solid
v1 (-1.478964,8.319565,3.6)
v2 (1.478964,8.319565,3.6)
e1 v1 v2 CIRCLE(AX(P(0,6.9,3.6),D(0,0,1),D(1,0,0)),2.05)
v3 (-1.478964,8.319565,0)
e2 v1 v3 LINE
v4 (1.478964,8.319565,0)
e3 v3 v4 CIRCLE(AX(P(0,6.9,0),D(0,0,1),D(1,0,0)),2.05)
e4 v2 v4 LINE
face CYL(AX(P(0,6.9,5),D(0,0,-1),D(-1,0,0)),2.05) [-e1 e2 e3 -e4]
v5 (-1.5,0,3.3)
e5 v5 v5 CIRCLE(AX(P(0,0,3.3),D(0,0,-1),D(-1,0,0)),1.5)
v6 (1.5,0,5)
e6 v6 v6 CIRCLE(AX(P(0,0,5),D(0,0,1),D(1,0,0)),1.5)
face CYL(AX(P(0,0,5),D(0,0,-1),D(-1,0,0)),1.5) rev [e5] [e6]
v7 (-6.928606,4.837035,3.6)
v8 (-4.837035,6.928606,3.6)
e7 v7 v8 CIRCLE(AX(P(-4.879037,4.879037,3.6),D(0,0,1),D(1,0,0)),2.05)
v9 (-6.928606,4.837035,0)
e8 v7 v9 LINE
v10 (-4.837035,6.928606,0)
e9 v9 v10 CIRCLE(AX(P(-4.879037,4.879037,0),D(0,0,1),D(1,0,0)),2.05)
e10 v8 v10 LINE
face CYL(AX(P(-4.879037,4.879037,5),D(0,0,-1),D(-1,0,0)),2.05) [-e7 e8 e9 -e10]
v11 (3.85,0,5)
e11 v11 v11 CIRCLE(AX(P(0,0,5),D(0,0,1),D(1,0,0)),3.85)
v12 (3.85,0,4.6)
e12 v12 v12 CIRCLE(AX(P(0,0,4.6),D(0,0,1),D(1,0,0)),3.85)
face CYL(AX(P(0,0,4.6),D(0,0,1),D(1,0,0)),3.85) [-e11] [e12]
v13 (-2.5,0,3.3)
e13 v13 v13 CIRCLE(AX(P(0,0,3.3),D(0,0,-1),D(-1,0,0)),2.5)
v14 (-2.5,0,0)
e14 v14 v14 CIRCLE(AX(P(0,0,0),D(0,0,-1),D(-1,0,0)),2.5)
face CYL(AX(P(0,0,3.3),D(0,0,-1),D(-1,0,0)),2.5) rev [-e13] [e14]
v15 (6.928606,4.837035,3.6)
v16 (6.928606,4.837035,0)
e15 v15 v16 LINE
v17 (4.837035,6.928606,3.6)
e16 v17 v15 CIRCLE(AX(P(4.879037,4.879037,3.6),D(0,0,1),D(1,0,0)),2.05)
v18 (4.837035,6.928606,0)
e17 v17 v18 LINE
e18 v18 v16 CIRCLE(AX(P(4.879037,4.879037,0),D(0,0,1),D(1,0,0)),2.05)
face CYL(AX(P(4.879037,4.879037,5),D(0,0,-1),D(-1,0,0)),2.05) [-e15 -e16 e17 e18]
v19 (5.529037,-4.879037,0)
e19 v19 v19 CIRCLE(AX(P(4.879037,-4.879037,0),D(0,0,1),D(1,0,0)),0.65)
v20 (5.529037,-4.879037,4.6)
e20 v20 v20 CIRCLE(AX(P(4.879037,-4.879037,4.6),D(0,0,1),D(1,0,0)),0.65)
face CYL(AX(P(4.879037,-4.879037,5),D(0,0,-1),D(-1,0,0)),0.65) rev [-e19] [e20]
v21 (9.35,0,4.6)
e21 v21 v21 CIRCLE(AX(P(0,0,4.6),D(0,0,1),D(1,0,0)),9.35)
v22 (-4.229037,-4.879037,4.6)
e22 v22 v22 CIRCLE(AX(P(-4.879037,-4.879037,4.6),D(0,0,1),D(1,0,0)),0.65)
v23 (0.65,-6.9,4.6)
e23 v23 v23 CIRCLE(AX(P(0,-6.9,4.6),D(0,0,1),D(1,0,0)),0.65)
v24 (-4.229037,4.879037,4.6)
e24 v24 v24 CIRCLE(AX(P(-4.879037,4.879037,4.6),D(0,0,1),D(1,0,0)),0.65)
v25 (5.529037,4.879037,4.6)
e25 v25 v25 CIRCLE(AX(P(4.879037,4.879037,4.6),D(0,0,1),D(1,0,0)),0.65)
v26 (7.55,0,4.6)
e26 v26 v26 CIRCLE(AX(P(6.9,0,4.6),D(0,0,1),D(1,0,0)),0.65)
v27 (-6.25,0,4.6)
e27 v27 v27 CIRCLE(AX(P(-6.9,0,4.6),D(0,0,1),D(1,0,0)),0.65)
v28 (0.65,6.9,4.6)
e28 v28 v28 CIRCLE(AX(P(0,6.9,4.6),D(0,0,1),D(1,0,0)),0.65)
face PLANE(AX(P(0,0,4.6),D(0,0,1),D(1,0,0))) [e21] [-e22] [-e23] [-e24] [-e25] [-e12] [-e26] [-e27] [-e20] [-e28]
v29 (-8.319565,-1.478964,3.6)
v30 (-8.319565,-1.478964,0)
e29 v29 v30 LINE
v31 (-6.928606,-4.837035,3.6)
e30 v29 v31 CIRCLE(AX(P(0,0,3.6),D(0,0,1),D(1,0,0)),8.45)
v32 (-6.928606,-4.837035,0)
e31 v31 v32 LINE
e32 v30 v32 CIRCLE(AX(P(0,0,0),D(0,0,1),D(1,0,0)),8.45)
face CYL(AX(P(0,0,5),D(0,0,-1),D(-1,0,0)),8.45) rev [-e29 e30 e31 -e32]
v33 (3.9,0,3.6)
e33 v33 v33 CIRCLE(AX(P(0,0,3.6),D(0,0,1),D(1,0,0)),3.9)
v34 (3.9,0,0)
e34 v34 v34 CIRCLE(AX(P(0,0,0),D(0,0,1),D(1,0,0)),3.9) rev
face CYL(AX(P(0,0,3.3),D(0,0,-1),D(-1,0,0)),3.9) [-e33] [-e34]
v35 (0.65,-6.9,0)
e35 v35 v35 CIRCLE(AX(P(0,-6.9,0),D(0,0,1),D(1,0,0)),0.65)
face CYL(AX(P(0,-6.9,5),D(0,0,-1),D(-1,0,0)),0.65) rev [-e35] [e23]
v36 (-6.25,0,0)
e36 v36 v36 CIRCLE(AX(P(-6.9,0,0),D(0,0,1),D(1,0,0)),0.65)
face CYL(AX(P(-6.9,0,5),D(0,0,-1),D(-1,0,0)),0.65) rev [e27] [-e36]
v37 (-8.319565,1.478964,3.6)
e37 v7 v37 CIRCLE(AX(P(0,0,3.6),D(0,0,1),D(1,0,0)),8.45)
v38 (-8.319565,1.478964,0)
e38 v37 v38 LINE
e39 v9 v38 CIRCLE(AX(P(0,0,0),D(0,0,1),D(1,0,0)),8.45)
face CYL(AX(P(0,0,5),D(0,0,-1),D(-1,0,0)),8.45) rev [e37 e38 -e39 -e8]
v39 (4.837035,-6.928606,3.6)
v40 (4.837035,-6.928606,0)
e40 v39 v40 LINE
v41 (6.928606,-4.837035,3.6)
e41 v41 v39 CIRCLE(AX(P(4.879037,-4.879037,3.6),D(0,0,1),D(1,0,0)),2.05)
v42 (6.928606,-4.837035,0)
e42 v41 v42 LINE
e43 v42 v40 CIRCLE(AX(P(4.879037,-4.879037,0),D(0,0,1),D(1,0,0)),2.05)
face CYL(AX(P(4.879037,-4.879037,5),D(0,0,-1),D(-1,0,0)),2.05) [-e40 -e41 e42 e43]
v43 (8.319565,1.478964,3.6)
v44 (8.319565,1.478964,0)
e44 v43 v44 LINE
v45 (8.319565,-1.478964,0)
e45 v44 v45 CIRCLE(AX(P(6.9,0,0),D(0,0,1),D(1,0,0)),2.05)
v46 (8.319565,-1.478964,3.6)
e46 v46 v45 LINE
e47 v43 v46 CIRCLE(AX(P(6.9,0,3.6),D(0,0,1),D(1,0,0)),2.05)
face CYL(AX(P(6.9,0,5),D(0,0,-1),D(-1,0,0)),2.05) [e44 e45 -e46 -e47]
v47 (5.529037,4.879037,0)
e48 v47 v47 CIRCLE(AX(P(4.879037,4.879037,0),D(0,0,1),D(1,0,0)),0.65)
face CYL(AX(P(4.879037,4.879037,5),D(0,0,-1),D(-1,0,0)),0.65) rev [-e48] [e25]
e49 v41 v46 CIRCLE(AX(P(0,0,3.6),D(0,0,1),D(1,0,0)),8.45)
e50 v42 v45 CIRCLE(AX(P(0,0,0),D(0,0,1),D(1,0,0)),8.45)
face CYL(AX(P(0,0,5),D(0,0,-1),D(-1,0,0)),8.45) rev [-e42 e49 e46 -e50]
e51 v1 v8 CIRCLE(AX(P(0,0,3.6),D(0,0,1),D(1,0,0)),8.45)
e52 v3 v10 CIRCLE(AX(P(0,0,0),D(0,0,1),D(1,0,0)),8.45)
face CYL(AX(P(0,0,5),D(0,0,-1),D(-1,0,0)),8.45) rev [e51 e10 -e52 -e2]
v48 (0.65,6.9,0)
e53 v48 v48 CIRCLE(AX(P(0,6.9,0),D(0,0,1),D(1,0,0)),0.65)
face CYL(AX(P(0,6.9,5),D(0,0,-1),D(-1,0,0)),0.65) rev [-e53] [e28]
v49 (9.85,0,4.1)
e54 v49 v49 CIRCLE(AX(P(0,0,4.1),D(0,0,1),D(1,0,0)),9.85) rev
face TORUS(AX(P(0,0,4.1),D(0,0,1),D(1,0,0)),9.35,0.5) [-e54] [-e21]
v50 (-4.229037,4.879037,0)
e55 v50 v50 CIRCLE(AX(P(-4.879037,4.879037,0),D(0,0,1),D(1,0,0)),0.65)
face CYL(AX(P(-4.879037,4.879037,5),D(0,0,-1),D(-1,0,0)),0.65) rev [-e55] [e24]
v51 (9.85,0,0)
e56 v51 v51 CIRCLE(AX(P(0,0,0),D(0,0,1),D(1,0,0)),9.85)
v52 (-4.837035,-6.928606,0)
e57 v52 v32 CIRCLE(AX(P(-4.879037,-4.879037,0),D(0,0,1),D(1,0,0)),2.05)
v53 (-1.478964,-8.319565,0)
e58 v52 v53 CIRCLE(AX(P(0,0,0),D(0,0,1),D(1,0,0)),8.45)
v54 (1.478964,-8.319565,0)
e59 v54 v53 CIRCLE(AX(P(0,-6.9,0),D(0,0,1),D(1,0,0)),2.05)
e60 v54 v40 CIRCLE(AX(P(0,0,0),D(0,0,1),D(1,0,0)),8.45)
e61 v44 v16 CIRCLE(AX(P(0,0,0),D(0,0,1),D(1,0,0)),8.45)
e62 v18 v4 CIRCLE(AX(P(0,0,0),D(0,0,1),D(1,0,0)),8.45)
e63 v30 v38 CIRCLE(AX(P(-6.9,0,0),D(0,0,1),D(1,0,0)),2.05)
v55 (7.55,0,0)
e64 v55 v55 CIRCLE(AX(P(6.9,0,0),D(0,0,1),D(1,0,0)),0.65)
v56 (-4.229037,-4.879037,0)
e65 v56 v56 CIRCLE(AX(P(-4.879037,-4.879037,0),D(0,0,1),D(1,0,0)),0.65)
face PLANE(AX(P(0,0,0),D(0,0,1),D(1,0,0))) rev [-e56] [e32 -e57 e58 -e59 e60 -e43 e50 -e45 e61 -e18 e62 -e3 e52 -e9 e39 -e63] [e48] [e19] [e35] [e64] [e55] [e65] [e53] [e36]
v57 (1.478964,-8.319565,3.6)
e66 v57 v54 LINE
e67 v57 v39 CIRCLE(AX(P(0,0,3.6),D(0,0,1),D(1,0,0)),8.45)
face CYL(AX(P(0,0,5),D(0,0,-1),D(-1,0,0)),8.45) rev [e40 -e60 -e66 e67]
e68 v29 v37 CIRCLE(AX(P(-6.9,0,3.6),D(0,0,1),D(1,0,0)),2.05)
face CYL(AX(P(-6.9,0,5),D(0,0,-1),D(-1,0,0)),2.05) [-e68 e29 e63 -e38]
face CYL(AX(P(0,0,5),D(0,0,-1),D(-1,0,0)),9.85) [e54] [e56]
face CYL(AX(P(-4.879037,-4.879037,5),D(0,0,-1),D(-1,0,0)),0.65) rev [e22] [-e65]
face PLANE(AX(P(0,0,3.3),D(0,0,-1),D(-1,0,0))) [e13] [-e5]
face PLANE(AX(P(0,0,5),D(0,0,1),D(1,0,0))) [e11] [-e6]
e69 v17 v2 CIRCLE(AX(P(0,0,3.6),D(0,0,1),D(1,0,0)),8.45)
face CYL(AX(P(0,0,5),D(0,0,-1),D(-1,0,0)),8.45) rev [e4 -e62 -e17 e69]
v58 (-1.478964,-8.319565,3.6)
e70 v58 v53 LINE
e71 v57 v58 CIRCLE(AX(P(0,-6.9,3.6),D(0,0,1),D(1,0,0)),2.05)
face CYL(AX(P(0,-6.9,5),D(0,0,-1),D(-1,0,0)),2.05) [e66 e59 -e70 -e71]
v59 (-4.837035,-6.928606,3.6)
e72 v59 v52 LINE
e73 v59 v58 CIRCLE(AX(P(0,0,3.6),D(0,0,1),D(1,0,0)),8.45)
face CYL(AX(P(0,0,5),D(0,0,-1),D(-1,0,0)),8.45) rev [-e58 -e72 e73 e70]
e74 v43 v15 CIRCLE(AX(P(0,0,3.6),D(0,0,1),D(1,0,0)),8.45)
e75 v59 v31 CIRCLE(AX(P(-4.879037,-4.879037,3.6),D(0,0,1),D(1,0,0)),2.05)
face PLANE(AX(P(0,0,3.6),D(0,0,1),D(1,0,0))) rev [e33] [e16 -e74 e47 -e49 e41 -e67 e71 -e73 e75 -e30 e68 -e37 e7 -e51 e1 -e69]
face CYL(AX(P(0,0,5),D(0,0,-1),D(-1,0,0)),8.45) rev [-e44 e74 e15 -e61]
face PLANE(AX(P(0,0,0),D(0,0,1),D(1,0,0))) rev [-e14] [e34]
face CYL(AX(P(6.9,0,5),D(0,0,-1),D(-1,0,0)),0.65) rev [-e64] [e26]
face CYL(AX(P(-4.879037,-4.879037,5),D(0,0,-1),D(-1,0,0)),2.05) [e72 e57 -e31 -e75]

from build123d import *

# Parameters (mm, degrees)
SKETCH1_R           = 9.85
SKETCH1_R_2         = 1.5
SKETCH1_R_3         = 0.65
BOSS_EXTRUDE1_DEPTH = 5
SKETCH4_R           = 2.5
CUT_EXTRUDE2_DEPTH  = 3.3
SHELL1_OUTLINE_R    = 3.9
SHELL1_DEPTH        = 3.6
CUT_EXTRUDE1_START  = -0.4
SKETCH3_R           = 9.85
SKETCH3_R_2         = 3.85
CUT_EXTRUDE1_DEPTH  = 0.4
FILLET1_R           = 0.5


# Read off the part's stored shape, not the designer's step: Shell1
with BuildPart() as part:
    # Sketch1 → Boss-Extrude1 (new body)
    with BuildSketch(Plane.XY):
        Circle(SKETCH1_R)
        Circle(SKETCH1_R_2, mode=Mode.SUBTRACT)
        with Locations((0, 6.9)):
            Circle(SKETCH1_R_3, mode=Mode.SUBTRACT)
        with Locations((4.87903679, 4.87903679)):
            Circle(SKETCH1_R_3, mode=Mode.SUBTRACT)
        with Locations((6.9, 0)):
            Circle(SKETCH1_R_3, mode=Mode.SUBTRACT)
        with Locations((4.87903679, -4.87903679)):
            Circle(SKETCH1_R_3, mode=Mode.SUBTRACT)
        with Locations((0, -6.9)):
            Circle(SKETCH1_R_3, mode=Mode.SUBTRACT)
        with Locations((-4.87903679, -4.87903679)):
            Circle(SKETCH1_R_3, mode=Mode.SUBTRACT)
        with Locations((-6.9, 0)):
            Circle(SKETCH1_R_3, mode=Mode.SUBTRACT)
        with Locations((-4.87903679, 4.87903679)):
            Circle(SKETCH1_R_3, mode=Mode.SUBTRACT)
    extrude(amount=BOSS_EXTRUDE1_DEPTH)

    # Sketch4 → Cut-Extrude2 (cut)
    with BuildSketch(Plane(origin=(0, 0, 0), x_dir=(-1, 0, 0), z_dir=(0, 0, -1))):
        Circle(SKETCH4_R)
    extrude(amount=-CUT_EXTRUDE2_DEPTH, mode=Mode.SUBTRACT)

    # Shell1 outline → Shell1 (cut)
    with BuildSketch(Plane.XY):
        with BuildLine():
            ThreePointArc((4.837035489, 6.928606474), (3.233675004, 7.80678205), (1.478964027, 8.319565217))
            ThreePointArc((1.478964027, 8.319565217), (0, 4.85), (-1.478964027, 8.319565217))
            ThreePointArc((-1.478964027, 8.319565217), (-3.233675004, 7.80678205), (-4.837035489, 6.928606474))
            ThreePointArc((-4.837035489, 6.928606474), (-3.429467889, 3.429467889), (-6.928606474, 4.837035489))
            ThreePointArc((-6.928606474, 4.837035489), (-7.80678205, 3.233675004), (-8.319565217, 1.478964027))
            ThreePointArc((-8.319565217, 1.478964027), (-4.85, 0), (-8.319565217, -1.478964027))
            ThreePointArc((-8.319565217, -1.478964027), (-7.80678205, -3.233675004), (-6.928606474, -4.837035489))
            ThreePointArc((-6.928606474, -4.837035489), (-3.429467889, -3.429467889), (-4.837035489, -6.928606474))
            ThreePointArc((-4.837035489, -6.928606474), (-3.233675004, -7.80678205), (-1.478964027, -8.319565217))
            ThreePointArc((-1.478964027, -8.319565217), (0, -4.85), (1.478964027, -8.319565217))
            ThreePointArc((1.478964027, -8.319565217), (3.233675004, -7.80678205), (4.837035489, -6.928606474))
            ThreePointArc((4.837035489, -6.928606474), (3.429467889, -3.429467889), (6.928606474, -4.837035489))
            ThreePointArc((6.928606474, -4.837035489), (7.80678205, -3.233675004), (8.319565217, -1.478964027))
            ThreePointArc((8.319565217, -1.478964027), (4.85, 0), (8.319565217, 1.478964027))
            ThreePointArc((8.319565217, 1.478964027), (7.80678205, 3.233675004), (6.928606474, 4.837035489))
            ThreePointArc((6.928606474, 4.837035489), (3.429467889, 3.429467889), (4.837035489, 6.928606474))
        make_face()
        Circle(SHELL1_OUTLINE_R, mode=Mode.SUBTRACT)
    extrude(amount=SHELL1_DEPTH, mode=Mode.SUBTRACT)

    # Sketch3 → Cut-Extrude1 (cut)
    with BuildSketch(Plane.XY.offset(5).offset(CUT_EXTRUDE1_START)):
        Circle(SKETCH3_R)
        Circle(SKETCH3_R_2, mode=Mode.SUBTRACT)
    extrude(amount=CUT_EXTRUDE1_DEPTH, mode=Mode.SUBTRACT)

    # Fillet1
    fillet1_edges = [part.edges().sort_by_distance(p)[0] for p in [
        (-9.85, 0, 4.6),
    ]]
    fillet(fillet1_edges, radius=FILLET1_R)


solid = part.part
